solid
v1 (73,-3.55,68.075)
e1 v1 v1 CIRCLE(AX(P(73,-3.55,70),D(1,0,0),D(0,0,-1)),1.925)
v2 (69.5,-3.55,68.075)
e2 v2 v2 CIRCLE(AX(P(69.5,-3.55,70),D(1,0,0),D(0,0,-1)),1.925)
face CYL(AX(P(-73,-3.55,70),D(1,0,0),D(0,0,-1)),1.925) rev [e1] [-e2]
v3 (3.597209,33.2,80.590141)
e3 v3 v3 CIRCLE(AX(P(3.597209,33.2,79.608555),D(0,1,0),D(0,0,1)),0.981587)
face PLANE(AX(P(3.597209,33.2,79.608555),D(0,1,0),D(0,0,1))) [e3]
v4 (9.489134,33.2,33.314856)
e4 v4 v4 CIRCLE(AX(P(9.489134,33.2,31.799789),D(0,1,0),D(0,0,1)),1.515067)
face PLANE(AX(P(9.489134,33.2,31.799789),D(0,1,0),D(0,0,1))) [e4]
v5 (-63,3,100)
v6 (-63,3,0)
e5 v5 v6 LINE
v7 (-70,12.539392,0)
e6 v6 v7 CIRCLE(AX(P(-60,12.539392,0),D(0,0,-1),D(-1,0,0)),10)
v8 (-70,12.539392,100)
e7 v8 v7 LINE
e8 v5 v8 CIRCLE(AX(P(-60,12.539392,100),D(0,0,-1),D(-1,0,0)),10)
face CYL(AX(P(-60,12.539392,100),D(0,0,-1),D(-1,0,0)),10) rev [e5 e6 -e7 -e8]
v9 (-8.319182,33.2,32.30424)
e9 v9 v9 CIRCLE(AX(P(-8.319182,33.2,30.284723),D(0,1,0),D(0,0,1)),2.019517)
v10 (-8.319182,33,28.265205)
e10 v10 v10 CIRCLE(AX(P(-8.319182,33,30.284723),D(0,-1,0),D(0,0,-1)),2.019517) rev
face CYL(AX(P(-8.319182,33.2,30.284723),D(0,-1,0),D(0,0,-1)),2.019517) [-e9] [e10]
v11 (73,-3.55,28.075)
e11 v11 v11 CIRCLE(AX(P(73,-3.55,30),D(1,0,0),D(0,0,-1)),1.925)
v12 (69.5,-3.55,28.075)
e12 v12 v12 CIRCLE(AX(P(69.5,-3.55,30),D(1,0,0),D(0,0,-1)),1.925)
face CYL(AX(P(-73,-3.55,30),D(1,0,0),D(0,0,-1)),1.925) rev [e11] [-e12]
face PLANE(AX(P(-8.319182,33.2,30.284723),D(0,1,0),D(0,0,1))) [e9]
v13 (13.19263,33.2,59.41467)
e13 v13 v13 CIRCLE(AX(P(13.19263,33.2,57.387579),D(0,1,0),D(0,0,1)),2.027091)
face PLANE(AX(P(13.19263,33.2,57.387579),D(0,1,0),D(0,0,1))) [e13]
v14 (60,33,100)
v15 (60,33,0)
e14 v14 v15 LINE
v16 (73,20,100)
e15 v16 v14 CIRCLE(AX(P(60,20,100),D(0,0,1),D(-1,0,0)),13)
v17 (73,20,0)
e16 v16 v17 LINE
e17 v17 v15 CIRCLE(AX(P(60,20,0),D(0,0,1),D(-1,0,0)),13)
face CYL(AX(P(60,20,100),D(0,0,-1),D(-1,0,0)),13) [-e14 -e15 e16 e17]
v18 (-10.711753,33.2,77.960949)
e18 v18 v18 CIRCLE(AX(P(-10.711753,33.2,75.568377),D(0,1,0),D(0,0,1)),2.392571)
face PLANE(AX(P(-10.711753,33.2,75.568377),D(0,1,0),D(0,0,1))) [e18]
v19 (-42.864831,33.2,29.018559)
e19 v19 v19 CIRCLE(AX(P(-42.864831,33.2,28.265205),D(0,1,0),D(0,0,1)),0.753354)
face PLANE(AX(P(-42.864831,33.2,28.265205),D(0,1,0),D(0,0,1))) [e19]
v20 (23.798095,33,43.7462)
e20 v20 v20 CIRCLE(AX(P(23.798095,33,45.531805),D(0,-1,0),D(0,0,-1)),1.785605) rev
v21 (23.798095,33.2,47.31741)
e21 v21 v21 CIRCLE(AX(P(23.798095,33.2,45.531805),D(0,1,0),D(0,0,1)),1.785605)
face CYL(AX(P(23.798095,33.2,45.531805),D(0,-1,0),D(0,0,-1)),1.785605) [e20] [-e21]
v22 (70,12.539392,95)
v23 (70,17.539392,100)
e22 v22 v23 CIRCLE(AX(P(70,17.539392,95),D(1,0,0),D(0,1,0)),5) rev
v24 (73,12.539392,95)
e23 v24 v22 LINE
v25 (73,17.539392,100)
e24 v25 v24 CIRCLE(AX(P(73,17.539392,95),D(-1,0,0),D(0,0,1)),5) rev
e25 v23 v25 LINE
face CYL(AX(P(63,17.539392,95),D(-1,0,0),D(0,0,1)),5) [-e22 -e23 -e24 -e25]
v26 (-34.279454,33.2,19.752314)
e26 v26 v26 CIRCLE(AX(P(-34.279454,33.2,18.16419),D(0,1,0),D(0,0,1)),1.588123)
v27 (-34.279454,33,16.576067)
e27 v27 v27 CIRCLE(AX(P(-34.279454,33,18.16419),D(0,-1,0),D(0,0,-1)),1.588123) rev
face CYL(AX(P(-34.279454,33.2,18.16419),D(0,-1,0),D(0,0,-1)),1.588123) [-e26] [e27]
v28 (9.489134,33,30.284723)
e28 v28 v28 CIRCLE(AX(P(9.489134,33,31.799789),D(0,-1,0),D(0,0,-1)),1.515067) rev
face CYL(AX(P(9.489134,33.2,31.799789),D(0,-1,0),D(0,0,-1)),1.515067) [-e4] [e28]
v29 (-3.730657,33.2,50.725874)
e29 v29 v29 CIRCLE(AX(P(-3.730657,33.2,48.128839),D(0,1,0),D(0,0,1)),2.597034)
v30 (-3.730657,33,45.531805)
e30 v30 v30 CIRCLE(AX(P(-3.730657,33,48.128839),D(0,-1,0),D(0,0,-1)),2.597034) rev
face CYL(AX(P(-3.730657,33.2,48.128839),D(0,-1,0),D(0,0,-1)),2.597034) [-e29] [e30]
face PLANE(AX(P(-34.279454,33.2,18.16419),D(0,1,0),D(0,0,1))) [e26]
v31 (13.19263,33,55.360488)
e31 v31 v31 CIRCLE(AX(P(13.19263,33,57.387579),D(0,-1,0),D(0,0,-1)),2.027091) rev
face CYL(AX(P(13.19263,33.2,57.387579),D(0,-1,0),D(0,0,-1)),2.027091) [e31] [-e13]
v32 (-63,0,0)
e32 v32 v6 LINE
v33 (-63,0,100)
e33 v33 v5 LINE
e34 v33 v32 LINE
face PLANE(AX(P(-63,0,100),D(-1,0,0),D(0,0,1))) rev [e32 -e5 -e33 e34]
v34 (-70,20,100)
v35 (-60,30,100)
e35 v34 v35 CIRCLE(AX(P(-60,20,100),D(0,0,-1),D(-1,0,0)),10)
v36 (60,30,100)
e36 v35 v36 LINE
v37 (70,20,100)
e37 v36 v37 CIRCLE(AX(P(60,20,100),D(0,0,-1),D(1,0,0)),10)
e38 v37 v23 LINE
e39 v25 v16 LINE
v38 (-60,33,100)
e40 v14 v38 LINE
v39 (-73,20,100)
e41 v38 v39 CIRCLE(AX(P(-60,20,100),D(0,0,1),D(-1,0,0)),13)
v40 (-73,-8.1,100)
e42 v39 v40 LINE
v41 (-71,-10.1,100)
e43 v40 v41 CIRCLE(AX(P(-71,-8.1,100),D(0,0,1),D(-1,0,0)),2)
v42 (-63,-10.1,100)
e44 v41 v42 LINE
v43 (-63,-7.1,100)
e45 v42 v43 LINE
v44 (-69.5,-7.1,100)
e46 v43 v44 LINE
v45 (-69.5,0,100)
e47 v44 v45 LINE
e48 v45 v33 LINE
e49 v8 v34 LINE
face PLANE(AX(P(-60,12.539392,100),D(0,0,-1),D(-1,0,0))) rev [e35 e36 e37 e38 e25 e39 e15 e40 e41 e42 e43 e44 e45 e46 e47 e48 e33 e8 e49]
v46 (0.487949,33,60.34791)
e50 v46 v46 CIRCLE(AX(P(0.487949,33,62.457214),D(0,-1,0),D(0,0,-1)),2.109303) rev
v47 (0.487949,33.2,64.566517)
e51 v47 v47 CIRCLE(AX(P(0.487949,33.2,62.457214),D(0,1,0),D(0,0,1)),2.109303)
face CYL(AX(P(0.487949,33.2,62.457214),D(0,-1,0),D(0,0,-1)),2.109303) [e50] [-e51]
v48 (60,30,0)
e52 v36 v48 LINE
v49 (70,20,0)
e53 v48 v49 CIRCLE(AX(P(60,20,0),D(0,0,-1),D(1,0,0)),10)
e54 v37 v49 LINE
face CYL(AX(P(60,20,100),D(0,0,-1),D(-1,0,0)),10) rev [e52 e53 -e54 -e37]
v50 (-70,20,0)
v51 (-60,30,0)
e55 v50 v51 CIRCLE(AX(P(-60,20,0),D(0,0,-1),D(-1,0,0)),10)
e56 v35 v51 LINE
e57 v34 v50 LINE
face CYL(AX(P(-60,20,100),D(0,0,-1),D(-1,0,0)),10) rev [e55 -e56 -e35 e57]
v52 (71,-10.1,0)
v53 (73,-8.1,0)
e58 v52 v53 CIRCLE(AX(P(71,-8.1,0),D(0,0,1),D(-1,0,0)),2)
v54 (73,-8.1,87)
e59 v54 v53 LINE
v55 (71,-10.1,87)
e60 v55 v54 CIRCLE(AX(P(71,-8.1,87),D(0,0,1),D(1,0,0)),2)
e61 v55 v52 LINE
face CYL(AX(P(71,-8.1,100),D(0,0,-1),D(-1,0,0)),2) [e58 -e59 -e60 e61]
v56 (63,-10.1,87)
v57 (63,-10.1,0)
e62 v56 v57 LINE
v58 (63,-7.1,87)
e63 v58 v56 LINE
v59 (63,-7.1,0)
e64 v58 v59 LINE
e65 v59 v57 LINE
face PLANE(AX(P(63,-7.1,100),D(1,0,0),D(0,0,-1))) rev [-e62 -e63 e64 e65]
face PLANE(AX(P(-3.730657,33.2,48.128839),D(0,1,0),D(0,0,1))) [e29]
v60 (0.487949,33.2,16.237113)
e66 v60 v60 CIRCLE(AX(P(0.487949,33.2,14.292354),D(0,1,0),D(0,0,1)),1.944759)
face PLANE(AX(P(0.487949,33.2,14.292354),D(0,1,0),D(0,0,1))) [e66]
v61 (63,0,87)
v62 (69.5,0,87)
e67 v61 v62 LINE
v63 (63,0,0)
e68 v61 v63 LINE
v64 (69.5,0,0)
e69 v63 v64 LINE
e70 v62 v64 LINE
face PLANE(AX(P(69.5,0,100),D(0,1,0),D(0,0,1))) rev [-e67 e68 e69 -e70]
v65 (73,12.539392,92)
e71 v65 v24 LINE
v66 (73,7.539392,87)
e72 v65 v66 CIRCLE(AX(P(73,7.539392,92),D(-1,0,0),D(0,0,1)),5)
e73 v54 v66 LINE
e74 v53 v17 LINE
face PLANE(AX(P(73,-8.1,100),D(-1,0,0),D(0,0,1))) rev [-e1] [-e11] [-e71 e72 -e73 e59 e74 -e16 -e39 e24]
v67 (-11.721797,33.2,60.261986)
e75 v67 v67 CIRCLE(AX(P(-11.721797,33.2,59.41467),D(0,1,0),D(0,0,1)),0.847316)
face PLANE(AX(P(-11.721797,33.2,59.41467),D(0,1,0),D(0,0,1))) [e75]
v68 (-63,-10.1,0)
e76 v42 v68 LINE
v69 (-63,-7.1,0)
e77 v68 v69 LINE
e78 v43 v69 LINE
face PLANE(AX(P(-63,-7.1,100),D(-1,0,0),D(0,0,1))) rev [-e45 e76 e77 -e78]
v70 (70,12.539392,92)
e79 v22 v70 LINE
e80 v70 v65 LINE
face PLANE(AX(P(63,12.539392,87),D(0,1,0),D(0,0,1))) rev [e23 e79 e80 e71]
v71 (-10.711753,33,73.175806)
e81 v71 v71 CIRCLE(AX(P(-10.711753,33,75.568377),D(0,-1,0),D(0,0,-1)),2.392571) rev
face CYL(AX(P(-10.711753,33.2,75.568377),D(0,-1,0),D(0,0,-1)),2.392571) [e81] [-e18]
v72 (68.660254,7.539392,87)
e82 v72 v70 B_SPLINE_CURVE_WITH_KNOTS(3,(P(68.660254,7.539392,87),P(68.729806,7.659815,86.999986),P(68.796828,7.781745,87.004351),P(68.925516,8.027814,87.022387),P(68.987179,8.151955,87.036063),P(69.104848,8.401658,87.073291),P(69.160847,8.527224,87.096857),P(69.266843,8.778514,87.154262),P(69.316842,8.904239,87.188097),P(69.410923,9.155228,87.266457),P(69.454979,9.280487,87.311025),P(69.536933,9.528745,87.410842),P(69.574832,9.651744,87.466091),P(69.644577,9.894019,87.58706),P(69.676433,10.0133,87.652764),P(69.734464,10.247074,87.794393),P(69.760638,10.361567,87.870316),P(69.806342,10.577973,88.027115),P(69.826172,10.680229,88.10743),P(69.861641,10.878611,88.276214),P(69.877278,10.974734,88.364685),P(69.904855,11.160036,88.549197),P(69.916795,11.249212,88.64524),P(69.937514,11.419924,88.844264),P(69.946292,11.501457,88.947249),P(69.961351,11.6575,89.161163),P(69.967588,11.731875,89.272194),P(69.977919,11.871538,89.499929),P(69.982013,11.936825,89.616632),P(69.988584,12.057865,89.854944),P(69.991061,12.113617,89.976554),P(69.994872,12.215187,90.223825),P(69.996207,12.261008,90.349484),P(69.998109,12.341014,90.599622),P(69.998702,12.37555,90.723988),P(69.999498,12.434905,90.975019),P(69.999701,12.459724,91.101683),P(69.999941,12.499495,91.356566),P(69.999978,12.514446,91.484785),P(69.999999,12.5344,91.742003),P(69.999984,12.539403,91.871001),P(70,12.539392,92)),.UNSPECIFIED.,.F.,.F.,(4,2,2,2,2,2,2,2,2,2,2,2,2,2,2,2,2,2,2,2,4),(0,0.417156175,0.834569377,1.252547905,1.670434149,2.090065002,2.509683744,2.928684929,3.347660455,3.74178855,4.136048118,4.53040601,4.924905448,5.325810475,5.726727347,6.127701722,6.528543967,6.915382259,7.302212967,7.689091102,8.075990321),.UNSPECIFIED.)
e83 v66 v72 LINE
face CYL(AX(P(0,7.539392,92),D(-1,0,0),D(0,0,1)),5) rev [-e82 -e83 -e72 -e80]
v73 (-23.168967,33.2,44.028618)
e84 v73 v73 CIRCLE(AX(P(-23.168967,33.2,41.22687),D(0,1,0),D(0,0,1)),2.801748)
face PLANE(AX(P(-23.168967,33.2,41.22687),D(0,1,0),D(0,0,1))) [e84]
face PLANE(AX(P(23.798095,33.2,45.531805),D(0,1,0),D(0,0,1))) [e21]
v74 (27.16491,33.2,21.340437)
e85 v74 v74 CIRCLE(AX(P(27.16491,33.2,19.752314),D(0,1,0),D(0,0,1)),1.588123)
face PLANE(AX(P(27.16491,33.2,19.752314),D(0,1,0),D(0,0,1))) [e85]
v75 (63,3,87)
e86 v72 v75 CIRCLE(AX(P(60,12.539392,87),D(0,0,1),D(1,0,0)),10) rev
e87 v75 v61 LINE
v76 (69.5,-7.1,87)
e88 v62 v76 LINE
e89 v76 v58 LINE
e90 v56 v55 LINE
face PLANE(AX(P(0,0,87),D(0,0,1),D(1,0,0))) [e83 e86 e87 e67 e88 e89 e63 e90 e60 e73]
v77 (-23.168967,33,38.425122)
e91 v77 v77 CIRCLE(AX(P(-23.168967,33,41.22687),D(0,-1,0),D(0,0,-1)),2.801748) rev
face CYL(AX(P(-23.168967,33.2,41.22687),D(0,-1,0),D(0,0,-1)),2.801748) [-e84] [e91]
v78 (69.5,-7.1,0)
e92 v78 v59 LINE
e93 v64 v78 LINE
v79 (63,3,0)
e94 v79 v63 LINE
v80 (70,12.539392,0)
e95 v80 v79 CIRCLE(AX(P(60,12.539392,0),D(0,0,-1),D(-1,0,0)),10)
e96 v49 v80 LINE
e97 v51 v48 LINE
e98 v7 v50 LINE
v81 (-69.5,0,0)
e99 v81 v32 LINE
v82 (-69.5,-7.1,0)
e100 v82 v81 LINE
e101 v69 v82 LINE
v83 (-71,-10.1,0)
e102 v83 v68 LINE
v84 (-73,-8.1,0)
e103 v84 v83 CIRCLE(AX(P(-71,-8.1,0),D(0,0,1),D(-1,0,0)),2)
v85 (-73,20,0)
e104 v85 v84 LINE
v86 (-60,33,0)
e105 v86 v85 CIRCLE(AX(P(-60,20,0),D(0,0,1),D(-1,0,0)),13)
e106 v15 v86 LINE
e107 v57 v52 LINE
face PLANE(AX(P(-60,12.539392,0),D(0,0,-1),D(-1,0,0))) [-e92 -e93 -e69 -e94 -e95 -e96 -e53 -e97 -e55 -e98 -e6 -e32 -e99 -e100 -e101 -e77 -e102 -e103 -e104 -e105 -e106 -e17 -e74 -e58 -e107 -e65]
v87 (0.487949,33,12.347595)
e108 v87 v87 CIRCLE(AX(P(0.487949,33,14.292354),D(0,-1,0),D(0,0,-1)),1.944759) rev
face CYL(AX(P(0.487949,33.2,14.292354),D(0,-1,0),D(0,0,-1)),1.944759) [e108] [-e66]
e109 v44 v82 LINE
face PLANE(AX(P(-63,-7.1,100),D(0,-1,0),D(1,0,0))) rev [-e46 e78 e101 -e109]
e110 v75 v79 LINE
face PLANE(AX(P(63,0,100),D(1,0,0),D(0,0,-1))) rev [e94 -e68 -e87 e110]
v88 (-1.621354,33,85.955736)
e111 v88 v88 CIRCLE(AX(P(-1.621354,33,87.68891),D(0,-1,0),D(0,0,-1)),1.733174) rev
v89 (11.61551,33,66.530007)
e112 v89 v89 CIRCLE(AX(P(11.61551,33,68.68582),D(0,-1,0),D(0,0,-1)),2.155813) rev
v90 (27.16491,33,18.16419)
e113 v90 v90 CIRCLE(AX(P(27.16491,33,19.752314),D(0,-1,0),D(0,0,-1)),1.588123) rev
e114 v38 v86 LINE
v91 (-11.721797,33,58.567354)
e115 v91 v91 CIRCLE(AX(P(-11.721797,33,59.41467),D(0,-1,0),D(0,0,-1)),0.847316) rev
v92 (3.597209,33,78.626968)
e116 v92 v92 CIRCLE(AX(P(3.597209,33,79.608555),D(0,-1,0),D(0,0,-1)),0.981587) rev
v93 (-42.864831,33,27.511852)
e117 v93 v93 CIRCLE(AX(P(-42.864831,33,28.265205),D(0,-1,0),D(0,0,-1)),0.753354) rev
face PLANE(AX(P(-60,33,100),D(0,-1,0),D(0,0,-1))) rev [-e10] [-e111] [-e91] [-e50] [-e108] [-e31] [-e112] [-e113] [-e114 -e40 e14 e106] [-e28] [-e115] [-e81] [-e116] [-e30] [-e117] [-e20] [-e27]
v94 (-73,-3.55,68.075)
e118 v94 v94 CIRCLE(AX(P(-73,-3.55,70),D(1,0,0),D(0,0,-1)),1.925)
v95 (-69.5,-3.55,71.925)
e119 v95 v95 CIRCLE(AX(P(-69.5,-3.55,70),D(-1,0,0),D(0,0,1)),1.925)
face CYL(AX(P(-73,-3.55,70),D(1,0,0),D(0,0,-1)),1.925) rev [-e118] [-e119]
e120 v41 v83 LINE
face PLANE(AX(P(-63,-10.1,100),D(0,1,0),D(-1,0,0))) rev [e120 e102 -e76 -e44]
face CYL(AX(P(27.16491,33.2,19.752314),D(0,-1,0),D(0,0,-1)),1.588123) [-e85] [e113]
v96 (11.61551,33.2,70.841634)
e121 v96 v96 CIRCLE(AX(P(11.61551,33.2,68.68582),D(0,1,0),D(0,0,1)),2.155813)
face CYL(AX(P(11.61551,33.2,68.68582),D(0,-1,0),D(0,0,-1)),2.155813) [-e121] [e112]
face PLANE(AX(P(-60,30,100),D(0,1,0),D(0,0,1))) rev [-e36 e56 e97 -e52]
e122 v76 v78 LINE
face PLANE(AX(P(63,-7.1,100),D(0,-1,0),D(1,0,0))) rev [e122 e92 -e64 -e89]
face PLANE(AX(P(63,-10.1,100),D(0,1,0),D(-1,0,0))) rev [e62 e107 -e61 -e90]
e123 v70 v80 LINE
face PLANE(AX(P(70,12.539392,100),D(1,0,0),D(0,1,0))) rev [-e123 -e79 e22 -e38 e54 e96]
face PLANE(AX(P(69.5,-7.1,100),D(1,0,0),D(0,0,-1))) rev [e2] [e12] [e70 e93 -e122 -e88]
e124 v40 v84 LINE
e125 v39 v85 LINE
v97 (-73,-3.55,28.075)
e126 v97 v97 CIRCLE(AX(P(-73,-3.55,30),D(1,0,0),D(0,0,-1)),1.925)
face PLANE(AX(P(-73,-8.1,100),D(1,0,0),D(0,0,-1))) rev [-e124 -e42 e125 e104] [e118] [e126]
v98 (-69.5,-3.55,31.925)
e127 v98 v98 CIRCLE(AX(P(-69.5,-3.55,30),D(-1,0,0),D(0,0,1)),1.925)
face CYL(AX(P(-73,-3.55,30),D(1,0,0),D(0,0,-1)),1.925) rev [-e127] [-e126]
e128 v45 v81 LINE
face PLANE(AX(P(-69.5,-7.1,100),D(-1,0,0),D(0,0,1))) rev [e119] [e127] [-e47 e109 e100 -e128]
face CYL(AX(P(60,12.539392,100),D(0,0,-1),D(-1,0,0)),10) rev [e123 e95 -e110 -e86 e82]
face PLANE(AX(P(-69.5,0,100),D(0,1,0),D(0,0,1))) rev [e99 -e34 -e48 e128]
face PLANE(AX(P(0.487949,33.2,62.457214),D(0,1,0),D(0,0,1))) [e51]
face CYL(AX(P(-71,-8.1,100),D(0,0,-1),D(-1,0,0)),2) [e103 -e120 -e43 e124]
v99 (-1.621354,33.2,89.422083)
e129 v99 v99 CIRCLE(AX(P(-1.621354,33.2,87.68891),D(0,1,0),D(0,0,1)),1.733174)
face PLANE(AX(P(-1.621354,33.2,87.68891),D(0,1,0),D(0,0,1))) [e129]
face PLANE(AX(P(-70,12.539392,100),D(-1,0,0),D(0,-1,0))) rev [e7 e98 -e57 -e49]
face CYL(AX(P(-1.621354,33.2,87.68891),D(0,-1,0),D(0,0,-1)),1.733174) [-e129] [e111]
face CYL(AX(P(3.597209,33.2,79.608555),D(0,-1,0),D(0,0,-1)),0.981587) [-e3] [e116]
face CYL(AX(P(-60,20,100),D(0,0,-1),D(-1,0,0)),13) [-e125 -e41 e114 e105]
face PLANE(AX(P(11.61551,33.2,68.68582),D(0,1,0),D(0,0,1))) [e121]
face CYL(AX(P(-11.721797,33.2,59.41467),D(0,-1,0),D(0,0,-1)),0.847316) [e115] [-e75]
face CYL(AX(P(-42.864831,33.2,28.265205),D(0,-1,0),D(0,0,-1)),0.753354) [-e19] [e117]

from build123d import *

# Parameters (mm, degrees)
BOSS_EXTRUDE1_DEPTH = 100
SKETCH2_R           = 1.925
CUT_EXTRUDE1_DEPTH  = 181.013888353
SKETCH3_W           = 10
SKETCH3_H           = 22.639392014
CUT_EXTRUDE2_DEPTH  = 13
FILLET1_R           = 5
SKETCH4_R           = 1.733173836
SKETCH4_R_2         = 0.981586666
SKETCH4_R_3         = 2.392571232
SKETCH4_R_4         = 2.109303231
SKETCH4_R_5         = 2.027090755
SKETCH4_R_6         = 2.155813145
SKETCH4_R_7         = 2.801748037
SKETCH4_R_8         = 1.588123218
SKETCH4_R_9         = 1.944759062
SKETCH4_R_10        = 2.597034209
SKETCH4_R_11        = 0.847315687
SKETCH4_R_12        = 1.785604619
SKETCH4_R_13        = 1.51506652
SKETCH4_R_14        = 2.019517128
SKETCH4_R_15        = 0.753353873
BOSS_EXTRUDE2_DEPTH = 0.2


with BuildPart() as part:
    # Sketch1 → Boss-Extrude1 (new body)
    with BuildSketch(Plane.XY):
        with BuildLine():
            Line((-63, -7.1), (-63, -10.1))
            Line((-63, -10.1), (-71, -10.1))
            ThreePointArc((-71, -10.1), (-72.414213562, -9.514213562), (-73, -8.1))
            Line((-73, -8.1), (-73, 20))
            ThreePointArc((-73, 20), (-69.192388155, 29.192388155), (-60, 33))
            Line((-60, 33), (60, 33))
            ThreePointArc((60, 33), (69.192388155, 29.192388155), (73, 20))
            Line((73, 20), (73, -8.1))
            ThreePointArc((73, -8.1), (72.414213562, -9.514213562), (71, -10.1))
            Line((71, -10.1), (63, -10.1))
            Line((63, -10.1), (63, -7.1))
            Line((63, -7.1), (69.5, -7.1))
            Line((69.5, -7.1), (69.5, 0))
            Line((69.5, 0), (63, 0))
            Line((63, 0), (63, 3))
            ThreePointArc((63, 3), (68.062257748, 6.623312231), (70, 12.539392014))
            Line((70, 12.539392014), (70, 20))
            ThreePointArc((70, 20), (67.071067812, 27.071067812), (60, 30))
            Line((60, 30), (-60, 30))
            ThreePointArc((-60, 30), (-67.071067812, 27.071067812), (-70, 20))
            Line((-70, 20), (-70, 12.539392014))
            ThreePointArc((-70, 12.539392014), (-68.062257748, 6.623312231), (-63, 3))
            Line((-63, 3), (-63, 0))
            Line((-63, 0), (-69.5, 0))
            Line((-69.5, 0), (-69.5, -7.1))
            Line((-69.5, -7.1), (-63, -7.1))
        make_face()
    extrude(amount=BOSS_EXTRUDE1_DEPTH)

    # Sketch2 → Cut-Extrude1 (cut, through all)
    with BuildSketch(Plane(origin=(73, 0, 0), x_dir=(0, 0, -1), z_dir=(1, 0, 0))):
        with Locations((-70, -3.55)):
            Circle(SKETCH2_R)
        with Locations((-30, -3.55)):
            Circle(SKETCH2_R)
    extrude(amount=-CUT_EXTRUDE1_DEPTH, mode=Mode.SUBTRACT)

    # Sketch3 → Cut-Extrude2 (cut)
    with BuildSketch(Plane.XY.offset(100)):
        with Locations((68, 1.219696007)):
            Rectangle(SKETCH3_W, SKETCH3_H)
    extrude(amount=-CUT_EXTRUDE2_DEPTH, mode=Mode.SUBTRACT)

    # Fillet1
    # the kernel refuses this fillet: 5 mm, written as the material it adds along each edge
    with BuildSketch(Plane(origin=(57.5, 12.539392014, 87), x_dir=(0, 0, 1), z_dir=(1, 0, 0))) as fillet1_piece_1_section:
        with BuildLine():
            CenterArc((FILLET1_R, FILLET1_R), FILLET1_R, 180, 90)
            Line((0, FILLET1_R), (0, 0))
            Line((0, 0), (FILLET1_R, 0))
        make_face()
    fillet1_piece_1 = extrude(amount=15.5, mode=Mode.PRIVATE)
    fillet1_piece_1 = fillet1_piece_1 - Plane(origin=(60, 12.539392014, 87.300010579), x_dir=(0.30000000000000276, -0.9539392014169449, 0), z_dir=(0, 0, -1)) * Cylinder(10, 52, mode=Mode.PRIVATE)
    add(fillet1_piece_1)
    # the kernel refuses this fillet: 5 mm, written as the material it takes off along each edge
    with BuildSketch(Plane(origin=(57.5, 12.539392014, 100), x_dir=(0, 1, 0), z_dir=(1, 0, 0))) as fillet1_2_piece_1:
        with BuildLine():
            CenterArc((FILLET1_R, -FILLET1_R), FILLET1_R, 90, 90)
            Line((0, -FILLET1_R), (0, 0))
            Line((0, 0), (FILLET1_R, 0))
        make_face()
    extrude(amount=28, mode=Mode.SUBTRACT)

    # Sketch4 → Boss-Extrude2 (add)
    with BuildSketch(Plane(origin=(0, 33, 0), x_dir=(1, 0, 0), z_dir=(0, 1, 0))):
        with Locations(Location((-1.621353912, -87.688909541, 0), (0, 0, 90))):
            Circle(SKETCH4_R)
        with Locations(Location((3.597208545, -79.608554769, 0), (0, 0, 90))):
            Circle(SKETCH4_R_2)
        with Locations(Location((-10.711753031, -75.568377383, 0), (0, 0, 90))):
            Circle(SKETCH4_R_3)
        with Locations(Location((0.487949319, -62.457213607, 0), (0, 0, 90))):
            Circle(SKETCH4_R_4)
        with Locations(Location((13.192629836, -57.387579146, 0), (0, 0, 90))):
            Circle(SKETCH4_R_5)
        with Locations(Location((11.615509985, -68.68582041, 0), (0, 0, 90))):
            Circle(SKETCH4_R_6)
        with Locations(Location((-23.168966637, -41.226869603, 0), (0, 0, 90))):
            Circle(SKETCH4_R_7)
        with Locations(Location((-34.279454449, -18.164190358, 0), (0, 0, 90))):
            Circle(SKETCH4_R_8)
        with Locations(Location((0.487949319, -14.292353696, 0), (0, 0, 90))):
            Circle(SKETCH4_R_9)
        with Locations(Location((27.164909963, -19.752313576, 0), (0, 0, 90))):
            Circle(SKETCH4_R_8)
        with Locations(Location((-3.730657143, -48.128839304, 0), (0, 0, 90))):
            Circle(SKETCH4_R_10)
        with Locations(Location((-11.721797377, -59.414669901, 0), (0, 0, 90))):
            Circle(SKETCH4_R_11)
        with Locations(Location((23.798095474, -45.531805095, 0), (0, 0, 90))):
            Circle(SKETCH4_R_12)
        with Locations(Location((9.489133899, -31.799789035, 0), (0, 0, 90))):
            Circle(SKETCH4_R_13)
        with Locations(Location((-8.319181799, -30.284722516, 0), (0, 0, 90))):
            Circle(SKETCH4_R_14)
        with Locations(Location((-42.864831394, -28.265205387, 0), (0, 0, 90))):
            Circle(SKETCH4_R_15)
    extrude(amount=BOSS_EXTRUDE2_DEPTH)


solid = part.part
